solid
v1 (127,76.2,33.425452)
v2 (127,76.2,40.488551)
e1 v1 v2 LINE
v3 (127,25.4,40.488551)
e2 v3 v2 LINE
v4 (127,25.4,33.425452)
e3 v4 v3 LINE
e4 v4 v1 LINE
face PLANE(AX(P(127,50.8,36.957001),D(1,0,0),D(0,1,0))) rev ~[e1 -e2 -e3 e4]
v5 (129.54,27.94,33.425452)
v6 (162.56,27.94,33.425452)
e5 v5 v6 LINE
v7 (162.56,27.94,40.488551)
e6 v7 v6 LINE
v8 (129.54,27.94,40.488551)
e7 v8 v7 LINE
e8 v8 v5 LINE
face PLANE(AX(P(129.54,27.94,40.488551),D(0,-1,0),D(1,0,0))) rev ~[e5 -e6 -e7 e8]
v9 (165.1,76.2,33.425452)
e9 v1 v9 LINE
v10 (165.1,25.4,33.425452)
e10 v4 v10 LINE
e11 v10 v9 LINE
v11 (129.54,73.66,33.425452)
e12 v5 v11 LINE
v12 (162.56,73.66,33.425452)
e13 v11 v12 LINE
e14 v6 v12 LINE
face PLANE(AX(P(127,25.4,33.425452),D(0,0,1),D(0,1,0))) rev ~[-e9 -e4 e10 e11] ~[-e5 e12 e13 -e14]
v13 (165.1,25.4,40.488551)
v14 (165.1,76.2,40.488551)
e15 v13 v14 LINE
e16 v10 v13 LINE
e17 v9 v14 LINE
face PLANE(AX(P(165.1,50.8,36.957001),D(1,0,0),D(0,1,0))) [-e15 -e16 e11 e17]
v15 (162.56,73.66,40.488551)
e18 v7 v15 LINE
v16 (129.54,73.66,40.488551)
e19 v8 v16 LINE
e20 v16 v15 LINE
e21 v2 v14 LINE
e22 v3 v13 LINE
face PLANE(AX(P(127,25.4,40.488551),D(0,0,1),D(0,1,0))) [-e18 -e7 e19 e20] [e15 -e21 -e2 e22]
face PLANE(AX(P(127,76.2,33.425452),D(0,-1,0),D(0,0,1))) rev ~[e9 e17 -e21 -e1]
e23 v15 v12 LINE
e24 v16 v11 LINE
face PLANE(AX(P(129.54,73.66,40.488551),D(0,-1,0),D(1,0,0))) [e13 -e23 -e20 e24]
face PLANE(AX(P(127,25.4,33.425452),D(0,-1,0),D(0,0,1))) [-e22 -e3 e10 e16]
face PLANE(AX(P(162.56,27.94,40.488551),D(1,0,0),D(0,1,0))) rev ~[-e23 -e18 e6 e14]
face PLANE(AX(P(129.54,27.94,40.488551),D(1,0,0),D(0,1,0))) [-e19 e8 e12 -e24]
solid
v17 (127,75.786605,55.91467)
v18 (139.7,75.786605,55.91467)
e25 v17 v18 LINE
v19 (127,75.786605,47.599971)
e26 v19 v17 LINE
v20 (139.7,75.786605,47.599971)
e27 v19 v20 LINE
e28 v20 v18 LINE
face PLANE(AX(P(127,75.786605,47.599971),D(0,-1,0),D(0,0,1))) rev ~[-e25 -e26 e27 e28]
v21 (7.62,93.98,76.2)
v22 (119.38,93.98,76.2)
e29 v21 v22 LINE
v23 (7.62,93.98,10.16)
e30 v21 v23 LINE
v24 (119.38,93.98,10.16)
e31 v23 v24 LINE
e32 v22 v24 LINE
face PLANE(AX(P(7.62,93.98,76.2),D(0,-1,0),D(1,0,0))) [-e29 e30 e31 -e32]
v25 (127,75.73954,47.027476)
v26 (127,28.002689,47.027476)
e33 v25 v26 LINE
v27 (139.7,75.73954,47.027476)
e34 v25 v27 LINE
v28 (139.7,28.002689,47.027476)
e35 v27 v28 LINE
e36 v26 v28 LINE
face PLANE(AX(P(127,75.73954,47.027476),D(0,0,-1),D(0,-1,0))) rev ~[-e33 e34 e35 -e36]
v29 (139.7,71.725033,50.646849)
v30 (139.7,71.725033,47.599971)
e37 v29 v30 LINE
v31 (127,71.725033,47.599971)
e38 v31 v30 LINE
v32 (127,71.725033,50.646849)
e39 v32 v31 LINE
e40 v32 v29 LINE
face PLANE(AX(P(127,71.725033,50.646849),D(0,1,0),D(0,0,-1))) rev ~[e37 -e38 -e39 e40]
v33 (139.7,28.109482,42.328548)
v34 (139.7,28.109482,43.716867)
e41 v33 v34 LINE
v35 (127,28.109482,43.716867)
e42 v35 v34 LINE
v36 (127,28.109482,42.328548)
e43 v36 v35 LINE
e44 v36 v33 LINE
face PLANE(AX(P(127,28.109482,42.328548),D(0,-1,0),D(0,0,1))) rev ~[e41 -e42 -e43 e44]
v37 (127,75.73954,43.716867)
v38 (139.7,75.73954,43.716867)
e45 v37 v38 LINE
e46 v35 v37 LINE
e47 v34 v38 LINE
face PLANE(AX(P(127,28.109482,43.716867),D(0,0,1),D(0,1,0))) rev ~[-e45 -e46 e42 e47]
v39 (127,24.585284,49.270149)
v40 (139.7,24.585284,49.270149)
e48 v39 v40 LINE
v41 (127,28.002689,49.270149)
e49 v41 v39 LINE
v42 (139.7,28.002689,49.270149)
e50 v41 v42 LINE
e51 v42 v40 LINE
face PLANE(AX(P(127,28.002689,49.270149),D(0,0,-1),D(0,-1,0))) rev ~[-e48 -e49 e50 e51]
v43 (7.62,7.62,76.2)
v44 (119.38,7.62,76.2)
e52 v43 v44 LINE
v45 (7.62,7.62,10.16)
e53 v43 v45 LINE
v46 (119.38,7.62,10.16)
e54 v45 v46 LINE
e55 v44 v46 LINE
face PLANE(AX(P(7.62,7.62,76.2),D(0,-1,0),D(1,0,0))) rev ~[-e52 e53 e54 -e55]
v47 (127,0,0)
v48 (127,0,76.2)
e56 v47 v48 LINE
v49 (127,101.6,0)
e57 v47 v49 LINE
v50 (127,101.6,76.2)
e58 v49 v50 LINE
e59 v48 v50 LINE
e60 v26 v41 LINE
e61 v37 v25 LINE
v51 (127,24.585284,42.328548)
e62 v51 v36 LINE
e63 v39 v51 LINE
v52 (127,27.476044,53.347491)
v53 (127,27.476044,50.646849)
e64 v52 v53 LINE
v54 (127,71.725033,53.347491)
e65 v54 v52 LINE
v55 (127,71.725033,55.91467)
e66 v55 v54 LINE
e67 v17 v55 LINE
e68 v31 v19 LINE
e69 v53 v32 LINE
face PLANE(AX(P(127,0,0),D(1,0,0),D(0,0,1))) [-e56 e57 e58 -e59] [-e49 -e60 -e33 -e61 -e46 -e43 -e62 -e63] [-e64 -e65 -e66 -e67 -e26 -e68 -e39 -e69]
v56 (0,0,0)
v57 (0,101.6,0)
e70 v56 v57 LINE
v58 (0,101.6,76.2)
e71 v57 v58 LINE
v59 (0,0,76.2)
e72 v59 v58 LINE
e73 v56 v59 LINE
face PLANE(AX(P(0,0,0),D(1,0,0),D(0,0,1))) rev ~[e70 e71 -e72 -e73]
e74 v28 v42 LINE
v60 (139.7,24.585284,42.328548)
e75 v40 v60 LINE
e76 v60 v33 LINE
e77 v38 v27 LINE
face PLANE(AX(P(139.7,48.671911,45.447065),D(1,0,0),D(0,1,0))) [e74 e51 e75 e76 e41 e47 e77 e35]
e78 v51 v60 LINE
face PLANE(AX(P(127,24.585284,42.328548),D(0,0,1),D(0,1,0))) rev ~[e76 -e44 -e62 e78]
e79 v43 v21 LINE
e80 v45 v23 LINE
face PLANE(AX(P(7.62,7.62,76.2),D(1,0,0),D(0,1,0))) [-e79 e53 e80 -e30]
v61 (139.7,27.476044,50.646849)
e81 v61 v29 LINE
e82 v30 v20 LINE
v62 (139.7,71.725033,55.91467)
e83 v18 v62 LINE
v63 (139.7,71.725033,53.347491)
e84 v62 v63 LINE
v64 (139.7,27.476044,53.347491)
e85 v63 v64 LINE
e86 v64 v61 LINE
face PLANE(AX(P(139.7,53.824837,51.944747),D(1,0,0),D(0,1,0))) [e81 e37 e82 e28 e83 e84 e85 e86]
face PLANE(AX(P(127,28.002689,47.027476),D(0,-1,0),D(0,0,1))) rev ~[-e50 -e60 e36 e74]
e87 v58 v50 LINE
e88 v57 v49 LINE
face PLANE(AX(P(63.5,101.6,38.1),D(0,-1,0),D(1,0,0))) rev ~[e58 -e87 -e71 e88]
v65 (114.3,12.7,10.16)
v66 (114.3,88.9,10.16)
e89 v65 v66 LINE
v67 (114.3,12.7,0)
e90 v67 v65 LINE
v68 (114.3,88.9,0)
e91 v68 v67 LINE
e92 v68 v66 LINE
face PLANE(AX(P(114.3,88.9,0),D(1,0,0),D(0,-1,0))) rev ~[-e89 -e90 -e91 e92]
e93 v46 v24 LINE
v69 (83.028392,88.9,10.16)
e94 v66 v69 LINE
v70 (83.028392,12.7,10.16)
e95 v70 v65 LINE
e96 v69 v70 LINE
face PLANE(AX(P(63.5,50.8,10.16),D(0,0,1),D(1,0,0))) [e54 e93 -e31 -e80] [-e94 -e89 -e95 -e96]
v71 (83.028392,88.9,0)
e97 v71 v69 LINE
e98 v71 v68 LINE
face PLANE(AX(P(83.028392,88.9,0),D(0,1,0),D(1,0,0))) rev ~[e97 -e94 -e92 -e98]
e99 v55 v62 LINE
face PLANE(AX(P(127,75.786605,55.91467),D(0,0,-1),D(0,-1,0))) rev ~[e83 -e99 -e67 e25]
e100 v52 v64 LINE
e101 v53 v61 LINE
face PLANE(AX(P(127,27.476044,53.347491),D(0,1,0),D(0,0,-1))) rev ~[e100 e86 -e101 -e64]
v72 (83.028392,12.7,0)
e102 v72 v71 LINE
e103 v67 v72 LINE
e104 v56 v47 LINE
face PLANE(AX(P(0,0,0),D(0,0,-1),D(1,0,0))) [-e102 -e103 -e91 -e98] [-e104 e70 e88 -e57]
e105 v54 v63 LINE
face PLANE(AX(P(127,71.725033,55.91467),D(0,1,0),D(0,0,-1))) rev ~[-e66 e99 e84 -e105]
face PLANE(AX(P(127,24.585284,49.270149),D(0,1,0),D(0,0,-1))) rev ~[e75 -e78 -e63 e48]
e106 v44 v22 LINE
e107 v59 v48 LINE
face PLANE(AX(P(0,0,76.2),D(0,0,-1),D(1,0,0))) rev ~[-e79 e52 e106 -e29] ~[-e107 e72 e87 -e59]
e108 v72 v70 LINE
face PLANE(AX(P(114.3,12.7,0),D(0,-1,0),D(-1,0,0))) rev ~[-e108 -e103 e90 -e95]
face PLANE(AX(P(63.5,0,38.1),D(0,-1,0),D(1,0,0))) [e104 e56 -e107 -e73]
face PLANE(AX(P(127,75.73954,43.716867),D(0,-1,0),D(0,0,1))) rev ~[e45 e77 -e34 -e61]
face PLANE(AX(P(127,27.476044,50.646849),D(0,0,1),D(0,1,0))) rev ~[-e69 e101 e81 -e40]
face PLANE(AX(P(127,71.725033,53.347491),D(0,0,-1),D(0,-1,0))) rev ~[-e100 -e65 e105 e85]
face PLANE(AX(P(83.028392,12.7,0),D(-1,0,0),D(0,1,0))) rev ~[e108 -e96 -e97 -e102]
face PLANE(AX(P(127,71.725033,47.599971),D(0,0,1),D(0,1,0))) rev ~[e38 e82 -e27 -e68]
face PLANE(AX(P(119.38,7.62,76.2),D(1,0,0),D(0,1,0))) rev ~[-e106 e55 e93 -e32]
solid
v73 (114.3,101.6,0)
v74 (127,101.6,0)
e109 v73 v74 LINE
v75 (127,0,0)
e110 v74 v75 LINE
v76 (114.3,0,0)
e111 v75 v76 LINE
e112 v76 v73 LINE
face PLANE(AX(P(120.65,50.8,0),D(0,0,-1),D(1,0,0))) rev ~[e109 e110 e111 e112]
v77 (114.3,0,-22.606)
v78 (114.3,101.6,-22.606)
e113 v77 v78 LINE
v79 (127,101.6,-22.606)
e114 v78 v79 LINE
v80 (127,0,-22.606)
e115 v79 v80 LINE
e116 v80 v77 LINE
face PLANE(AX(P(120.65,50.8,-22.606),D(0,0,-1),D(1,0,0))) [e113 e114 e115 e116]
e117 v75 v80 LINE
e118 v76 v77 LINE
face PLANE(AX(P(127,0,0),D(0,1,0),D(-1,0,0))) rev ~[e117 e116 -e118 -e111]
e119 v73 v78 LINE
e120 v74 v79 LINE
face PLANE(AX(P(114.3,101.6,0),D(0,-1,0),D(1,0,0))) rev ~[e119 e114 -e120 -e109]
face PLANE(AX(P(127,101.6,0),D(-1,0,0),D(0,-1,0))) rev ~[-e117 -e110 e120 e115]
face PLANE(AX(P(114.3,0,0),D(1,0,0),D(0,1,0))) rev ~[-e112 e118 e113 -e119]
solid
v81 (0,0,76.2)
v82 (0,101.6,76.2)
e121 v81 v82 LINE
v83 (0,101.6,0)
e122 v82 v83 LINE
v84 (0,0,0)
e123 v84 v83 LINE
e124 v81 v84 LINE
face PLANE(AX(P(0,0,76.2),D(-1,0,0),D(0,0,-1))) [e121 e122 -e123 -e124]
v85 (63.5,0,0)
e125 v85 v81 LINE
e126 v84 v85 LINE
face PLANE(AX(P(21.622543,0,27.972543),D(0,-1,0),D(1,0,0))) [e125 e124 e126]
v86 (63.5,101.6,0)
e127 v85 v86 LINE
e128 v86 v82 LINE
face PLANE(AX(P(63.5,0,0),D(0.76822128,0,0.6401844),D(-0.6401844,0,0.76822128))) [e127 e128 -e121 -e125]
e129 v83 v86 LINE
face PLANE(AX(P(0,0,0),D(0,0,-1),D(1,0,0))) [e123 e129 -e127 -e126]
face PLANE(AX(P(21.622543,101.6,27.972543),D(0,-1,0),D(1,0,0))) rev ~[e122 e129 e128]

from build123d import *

# Parameters (mm, degrees)
F0_W      = 127
F0_H      = 76.2
F1_DEPTH  = 101.6
F2_W      = 111.76
F2_H      = 86.36
F3_DEPTH  = 66.04
F5_DEPTH  = 25.4
F7_DEPTH  = 22.606
F9_DEPTH  = 101.6
F10_W     = 50.8
F10_H     = 7.0630987705
F11_DEPTH = 38.1
F12_W     = 31.4156402662
F12_H     = 38.1
F13_DEPTH = 50.8
F16_W     = 33.02
F16_H     = 45.72
F16_W_2   = 31.4156402662
F16_H_2   = 38.1
F17_DEPTH = 25.4
F19_DEPTH = 12.7
F21_DEPTH = 12.7


# Not quite as in the source:
# - the program builds the solid bodies; features that only make, move or delete a surface that nothing else refers to are left out


with BuildPart() as f1:
    # F0 (on Front) → F1 (new body)
    with BuildSketch(Plane.XZ):
        with Locations((63.5, 38.1)):
            Rectangle(F0_W, F0_H)
    extrude(amount=-F1_DEPTH)

    # F2 (on face) → F3 (cut)
    with BuildSketch(Plane.XY.offset(76.2)):
        with Locations((63.5, 50.8)):
            Rectangle(F2_W, F2_H)
    extrude(amount=-F3_DEPTH, mode=Mode.SUBTRACT)

    # F4 (on face) → F5 (cut)
    with BuildSketch(Plane(origin=(0, 0, 0), x_dir=(1, 0, 0), z_dir=(0, 0, -1))):
        Polygon((114.3, -12.7), (83.0283915298, -12.7), (83.0283915298, -88.9), (90.3639442819, -88.9), (114.3, -88.9), align=None)
    extrude(amount=-F5_DEPTH, mode=Mode.SUBTRACT)

    # F18 (on face) → F19 (join)
    with BuildSketch(Plane.YZ.offset(127)):
        Polygon((24.5852842927, 49.2701493204), (24.5852842927, 42.3285476863), (28.1094815582, 42.3285476863), (28.1094815582, 43.716866523), (75.7395401597, 43.716866523), (75.7395401597, 47.0274761319), (61.3223686814, 47.0274761319), (28.0026886612, 47.0274761319), (28.0026886612, 49.2701493204), align=None)
    extrude(amount=F19_DEPTH)

    # F20 (on face) → F21 (join)
    with BuildSketch(Plane.YZ.offset(127)):
        Polygon((75.7866054773, 47.5999712944), (75.7866054773, 48.753041774), (75.7866054773, 52.4664781988), (75.7866054773, 55.914670229), (71.7250332236, 55.914670229), (71.7250332236, 53.3474907279), (27.4760443717, 53.3474907279), (27.4760443717, 50.6468489766), (71.7250332236, 50.6468489766), (71.7250332236, 47.5999712944), align=None)
    extrude(amount=F21_DEPTH)


with BuildPart() as f7:
    # F6 (on face) → F7 (new body)
    with BuildSketch(Plane(origin=(0, 0, 0), x_dir=(1, 0, 0), z_dir=(0, 0, -1))):
        Polygon((114.3, 0), (114.3, -12.7), (114.3, -88.9), (114.3, -101.6), (127, -101.6), (127, 0), align=None)
    extrude(amount=F7_DEPTH)


with BuildPart() as f9:
    # F8 (on face) → F9 (new body)
    with BuildSketch(Plane.XZ):
        Polygon((63.5, 0), (0, 76.2), (0, 0), align=None)
    extrude(amount=-F9_DEPTH)


with BuildPart() as f11:
    # F10 (on face) → F11 (new body)
    with BuildSketch(Plane.YZ.offset(127)):
        with Locations((50.8, 36.9570013136)):
            Rectangle(F10_W, F10_H)
    extrude(amount=F11_DEPTH)

    # F12 (on face) → F13 (cut)
    with BuildSketch(Plane.XY.offset(40.4885506988)):
        with Locations((145.3281798669, 50.8)):
            Rectangle(F12_W, F12_H)
    extrude(amount=-F13_DEPTH, mode=Mode.SUBTRACT)

    # F16 (on face) → F17 (cut)
    with BuildSketch(Plane.XY.offset(40.4885506988)):
        with Locations((146.05, 50.8)):
            Rectangle(F16_W, F16_H)
        with Locations((145.3281798669, 50.8)):
            Rectangle(F16_W_2, F16_H_2, mode=Mode.SUBTRACT)
    extrude(amount=-F17_DEPTH, mode=Mode.SUBTRACT)


solid = Compound([f1.part, f7.part, f9.part, f11.part])
